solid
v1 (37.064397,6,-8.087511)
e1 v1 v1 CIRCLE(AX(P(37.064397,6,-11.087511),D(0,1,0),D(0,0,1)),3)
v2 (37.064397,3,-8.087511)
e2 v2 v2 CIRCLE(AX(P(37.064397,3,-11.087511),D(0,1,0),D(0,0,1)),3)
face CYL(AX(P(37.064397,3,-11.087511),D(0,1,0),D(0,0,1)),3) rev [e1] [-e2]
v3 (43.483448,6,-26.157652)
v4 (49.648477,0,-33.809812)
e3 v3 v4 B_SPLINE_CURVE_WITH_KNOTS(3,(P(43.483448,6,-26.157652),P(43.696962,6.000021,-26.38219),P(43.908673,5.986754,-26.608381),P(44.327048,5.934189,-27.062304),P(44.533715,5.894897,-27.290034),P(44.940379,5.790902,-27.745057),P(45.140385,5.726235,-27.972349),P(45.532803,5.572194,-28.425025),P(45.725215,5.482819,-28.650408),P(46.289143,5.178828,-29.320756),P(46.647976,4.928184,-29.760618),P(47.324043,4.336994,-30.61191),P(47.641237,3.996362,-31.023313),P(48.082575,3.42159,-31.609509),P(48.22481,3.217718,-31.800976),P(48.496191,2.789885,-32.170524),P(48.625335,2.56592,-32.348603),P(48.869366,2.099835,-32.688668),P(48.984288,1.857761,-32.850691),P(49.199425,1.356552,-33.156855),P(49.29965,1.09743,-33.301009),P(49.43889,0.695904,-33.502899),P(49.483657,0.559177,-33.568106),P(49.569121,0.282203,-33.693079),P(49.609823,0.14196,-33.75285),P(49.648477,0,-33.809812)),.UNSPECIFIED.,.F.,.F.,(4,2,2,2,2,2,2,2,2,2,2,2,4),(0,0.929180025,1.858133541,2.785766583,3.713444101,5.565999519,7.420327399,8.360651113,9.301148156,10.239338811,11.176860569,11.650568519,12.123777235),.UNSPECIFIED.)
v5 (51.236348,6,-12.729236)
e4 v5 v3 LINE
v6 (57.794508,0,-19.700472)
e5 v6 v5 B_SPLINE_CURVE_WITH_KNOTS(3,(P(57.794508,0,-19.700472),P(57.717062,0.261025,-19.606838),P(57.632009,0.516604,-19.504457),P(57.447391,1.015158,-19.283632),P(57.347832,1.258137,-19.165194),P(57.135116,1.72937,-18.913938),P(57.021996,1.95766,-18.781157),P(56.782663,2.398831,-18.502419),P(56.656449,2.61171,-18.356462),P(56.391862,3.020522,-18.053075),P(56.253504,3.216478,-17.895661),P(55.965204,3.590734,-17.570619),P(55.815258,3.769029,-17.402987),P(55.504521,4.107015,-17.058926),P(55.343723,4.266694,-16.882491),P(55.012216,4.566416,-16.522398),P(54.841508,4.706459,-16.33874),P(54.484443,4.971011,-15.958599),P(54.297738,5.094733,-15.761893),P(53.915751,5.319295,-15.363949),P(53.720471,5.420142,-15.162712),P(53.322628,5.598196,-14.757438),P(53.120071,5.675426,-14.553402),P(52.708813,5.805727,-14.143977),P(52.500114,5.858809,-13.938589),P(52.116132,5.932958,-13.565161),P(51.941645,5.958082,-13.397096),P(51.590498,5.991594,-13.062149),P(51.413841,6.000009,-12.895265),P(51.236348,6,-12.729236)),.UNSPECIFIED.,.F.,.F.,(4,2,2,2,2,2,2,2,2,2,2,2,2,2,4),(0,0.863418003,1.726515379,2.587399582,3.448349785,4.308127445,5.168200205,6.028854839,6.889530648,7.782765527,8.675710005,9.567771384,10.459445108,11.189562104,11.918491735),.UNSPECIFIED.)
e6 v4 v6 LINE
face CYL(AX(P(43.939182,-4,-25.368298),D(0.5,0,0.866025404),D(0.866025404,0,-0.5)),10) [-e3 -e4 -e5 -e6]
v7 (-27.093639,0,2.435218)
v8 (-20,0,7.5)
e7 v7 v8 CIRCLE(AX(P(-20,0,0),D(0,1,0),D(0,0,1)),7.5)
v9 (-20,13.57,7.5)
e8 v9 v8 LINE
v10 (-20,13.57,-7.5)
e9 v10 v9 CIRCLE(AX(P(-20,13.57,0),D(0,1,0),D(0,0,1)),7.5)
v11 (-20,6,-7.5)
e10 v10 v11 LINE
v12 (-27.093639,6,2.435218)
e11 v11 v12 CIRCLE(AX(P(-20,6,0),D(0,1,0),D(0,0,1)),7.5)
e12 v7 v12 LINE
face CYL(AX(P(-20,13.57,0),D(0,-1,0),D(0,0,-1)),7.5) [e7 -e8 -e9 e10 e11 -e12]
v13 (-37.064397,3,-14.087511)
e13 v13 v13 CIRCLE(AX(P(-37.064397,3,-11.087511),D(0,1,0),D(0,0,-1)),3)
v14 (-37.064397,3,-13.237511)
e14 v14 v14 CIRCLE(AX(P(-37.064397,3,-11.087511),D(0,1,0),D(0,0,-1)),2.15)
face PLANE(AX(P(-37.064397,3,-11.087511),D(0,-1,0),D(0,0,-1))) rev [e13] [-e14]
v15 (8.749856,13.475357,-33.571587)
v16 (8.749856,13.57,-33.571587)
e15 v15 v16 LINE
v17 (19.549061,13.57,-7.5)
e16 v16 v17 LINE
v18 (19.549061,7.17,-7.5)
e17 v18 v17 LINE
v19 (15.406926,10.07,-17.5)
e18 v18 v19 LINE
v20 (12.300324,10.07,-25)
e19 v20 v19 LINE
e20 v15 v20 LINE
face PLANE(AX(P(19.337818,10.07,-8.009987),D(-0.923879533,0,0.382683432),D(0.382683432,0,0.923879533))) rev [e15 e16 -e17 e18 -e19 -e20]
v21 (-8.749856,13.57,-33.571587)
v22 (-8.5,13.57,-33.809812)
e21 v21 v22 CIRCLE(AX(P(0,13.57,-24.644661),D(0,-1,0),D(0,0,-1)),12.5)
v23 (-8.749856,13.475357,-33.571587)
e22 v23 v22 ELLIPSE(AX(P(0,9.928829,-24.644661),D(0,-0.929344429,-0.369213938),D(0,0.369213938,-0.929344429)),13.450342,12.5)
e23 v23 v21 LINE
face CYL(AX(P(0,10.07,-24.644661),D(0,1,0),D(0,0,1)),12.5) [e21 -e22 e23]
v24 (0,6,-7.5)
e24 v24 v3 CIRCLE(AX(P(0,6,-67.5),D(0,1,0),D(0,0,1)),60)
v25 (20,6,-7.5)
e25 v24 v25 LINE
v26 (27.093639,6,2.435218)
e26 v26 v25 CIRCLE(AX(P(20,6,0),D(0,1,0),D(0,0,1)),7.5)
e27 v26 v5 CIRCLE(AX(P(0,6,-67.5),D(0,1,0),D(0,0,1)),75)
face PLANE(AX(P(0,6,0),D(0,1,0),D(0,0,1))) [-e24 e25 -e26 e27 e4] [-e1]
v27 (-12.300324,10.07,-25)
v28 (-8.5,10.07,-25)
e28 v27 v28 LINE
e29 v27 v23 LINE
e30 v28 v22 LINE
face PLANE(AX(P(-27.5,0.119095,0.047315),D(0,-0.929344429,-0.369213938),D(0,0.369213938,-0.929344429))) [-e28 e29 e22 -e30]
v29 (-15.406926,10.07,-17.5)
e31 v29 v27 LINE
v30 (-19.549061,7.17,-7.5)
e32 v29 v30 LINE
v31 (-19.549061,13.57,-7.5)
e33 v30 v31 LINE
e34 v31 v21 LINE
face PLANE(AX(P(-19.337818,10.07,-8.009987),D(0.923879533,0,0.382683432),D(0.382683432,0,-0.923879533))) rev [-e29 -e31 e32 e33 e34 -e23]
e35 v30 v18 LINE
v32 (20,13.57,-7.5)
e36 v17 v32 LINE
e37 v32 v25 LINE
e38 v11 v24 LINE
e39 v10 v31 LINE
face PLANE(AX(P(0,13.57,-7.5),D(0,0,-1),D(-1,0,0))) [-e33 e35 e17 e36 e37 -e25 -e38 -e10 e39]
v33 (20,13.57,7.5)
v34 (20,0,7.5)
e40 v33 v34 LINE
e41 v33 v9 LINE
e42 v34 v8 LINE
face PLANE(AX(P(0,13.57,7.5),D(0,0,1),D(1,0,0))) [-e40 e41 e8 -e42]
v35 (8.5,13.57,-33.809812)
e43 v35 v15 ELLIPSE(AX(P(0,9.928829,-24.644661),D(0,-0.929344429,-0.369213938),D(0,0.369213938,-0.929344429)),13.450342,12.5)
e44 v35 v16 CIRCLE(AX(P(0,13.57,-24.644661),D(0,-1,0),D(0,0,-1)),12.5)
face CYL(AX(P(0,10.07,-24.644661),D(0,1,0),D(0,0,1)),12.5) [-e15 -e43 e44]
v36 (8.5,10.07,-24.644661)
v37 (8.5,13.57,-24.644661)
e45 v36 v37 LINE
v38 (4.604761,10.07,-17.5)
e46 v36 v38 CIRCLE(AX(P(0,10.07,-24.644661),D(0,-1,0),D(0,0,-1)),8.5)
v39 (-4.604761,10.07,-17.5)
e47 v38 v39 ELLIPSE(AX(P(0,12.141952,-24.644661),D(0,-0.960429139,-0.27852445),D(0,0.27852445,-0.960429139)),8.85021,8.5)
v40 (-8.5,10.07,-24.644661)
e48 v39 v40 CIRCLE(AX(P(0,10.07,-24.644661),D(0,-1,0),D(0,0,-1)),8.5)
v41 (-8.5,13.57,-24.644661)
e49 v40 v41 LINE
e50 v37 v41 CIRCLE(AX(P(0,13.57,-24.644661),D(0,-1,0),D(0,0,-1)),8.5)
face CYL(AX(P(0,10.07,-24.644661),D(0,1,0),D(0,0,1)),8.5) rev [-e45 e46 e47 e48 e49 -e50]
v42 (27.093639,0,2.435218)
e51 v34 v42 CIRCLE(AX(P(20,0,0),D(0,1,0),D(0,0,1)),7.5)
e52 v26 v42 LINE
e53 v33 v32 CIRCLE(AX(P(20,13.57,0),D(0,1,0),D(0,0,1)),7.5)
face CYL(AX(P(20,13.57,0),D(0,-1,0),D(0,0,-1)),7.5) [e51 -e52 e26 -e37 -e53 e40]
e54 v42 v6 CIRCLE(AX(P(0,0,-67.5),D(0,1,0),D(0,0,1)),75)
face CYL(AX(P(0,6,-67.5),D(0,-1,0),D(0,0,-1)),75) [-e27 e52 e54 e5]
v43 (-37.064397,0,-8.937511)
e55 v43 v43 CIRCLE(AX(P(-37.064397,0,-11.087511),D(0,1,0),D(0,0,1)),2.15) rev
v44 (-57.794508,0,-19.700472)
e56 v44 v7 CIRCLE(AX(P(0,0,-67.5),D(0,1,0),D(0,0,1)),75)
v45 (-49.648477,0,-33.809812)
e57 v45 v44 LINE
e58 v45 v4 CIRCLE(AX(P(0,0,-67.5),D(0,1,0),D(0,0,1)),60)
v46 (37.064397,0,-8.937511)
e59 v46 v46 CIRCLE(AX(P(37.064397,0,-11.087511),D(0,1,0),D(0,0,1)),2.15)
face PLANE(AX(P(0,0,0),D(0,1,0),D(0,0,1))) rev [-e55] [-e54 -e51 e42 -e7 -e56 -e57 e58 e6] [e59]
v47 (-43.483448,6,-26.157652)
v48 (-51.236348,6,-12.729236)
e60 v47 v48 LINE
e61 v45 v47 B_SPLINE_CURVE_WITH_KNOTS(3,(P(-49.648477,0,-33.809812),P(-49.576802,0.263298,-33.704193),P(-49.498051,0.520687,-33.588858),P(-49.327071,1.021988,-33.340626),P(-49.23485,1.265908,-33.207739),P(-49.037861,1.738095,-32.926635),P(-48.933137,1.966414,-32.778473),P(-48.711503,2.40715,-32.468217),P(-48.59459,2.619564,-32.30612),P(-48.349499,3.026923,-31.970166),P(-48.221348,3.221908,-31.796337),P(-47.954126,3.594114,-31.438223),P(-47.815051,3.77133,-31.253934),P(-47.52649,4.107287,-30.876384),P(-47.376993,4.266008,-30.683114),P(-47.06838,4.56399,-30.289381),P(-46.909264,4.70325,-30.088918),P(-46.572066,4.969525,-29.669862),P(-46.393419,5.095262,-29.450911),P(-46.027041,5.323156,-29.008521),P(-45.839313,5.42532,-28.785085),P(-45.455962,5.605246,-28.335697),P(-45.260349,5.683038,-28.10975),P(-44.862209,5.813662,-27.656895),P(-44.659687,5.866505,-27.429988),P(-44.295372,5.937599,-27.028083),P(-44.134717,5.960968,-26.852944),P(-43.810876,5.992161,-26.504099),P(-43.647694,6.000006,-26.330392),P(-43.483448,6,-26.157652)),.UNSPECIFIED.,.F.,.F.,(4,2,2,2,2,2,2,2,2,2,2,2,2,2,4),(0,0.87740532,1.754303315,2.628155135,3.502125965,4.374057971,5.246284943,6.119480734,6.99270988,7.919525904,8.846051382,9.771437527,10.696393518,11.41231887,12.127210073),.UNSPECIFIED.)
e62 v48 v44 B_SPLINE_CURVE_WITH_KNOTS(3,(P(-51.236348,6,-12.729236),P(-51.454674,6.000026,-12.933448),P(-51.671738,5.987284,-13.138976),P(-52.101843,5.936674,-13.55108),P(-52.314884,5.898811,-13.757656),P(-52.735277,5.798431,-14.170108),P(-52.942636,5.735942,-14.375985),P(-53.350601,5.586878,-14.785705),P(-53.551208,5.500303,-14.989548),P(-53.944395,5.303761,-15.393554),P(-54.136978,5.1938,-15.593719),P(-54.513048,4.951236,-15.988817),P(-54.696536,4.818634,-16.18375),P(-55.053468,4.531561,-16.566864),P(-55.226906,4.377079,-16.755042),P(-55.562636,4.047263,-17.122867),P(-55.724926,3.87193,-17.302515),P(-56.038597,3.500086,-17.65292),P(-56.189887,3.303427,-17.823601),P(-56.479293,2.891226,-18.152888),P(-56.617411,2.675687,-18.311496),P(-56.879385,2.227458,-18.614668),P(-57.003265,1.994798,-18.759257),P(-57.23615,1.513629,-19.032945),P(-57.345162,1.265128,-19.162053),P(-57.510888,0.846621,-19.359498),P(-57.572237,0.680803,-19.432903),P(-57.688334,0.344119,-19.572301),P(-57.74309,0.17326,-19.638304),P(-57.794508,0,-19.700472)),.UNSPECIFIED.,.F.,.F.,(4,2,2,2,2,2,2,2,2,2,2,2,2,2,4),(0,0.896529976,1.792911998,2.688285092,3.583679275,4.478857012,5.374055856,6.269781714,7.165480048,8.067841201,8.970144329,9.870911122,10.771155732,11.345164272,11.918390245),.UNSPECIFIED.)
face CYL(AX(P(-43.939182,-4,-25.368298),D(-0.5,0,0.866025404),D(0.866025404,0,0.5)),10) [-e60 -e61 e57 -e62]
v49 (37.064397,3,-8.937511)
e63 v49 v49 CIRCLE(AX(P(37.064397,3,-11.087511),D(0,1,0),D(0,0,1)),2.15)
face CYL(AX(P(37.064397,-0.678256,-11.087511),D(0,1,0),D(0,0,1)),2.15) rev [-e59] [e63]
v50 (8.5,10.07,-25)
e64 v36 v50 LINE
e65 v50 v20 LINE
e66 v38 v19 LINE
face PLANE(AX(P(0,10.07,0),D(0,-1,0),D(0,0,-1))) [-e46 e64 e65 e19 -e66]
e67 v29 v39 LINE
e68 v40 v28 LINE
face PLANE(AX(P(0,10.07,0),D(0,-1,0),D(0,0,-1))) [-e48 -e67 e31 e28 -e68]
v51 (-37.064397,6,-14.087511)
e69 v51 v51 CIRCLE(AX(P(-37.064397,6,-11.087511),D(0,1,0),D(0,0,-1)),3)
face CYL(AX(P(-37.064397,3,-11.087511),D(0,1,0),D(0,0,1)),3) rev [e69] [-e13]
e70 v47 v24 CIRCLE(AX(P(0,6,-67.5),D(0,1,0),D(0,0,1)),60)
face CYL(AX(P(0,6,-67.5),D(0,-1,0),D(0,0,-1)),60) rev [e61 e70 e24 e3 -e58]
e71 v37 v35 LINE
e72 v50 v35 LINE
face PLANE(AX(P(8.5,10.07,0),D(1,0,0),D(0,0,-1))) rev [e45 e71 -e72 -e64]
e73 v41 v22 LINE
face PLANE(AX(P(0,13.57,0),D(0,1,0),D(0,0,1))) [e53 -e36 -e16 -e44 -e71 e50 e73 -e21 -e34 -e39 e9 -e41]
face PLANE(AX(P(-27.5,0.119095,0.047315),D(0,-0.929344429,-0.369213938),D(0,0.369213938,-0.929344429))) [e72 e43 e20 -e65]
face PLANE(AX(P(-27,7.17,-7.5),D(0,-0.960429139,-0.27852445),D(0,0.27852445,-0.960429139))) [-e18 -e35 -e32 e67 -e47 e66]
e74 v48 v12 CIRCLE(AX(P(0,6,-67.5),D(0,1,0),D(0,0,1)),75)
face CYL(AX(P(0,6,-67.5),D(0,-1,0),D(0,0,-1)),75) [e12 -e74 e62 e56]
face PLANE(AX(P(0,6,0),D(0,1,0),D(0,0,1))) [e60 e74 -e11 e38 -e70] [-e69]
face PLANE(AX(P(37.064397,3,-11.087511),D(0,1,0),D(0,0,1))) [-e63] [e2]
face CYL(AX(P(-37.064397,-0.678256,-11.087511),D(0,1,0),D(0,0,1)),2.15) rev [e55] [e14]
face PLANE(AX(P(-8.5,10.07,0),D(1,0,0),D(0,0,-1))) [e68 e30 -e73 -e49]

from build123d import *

# Parameters (mm, degrees)
BOSS_EXTRUDE1_DEPTH      = 13.57
BOSS_EXTRUDE3_DEPTH      = 3.5
BOSS_EXTRUDE4_DEPTH      = 26
BOSS_EXTRUDE4_DEPTH_BACK = 27
CUT_EXTRUDE1_DEPTH       = 45.729836908
CUT_EXTRUDE1_DEPTH_BACK  = 45.729836908
CUT_EXTRUDE2_DEPTH       = 46.64535365
CUT_EXTRUDE2_DEPTH_BACK  = 46.64535365
BOSS_EXTRUDE5_DEPTH      = 6
FILLET1_R                = 10
SKETCH8_R                = 2.15
CUT_EXTRUDE3_DEPTH       = 68.384074457
SKETCH8_4_R              = 3
SKETCH8_4_R_2            = 2.15
CUT_EXTRUDE4_DEPTH       = 3


with BuildPart() as part:
    # Sketch1 → Boss-Extrude1 (new body)
    with BuildSketch(Plane(origin=(0, 0, 0), x_dir=(1, 0, 0), z_dir=(0, 1, 0))):
        with BuildLine():
            Line((20, 7.5), (-20, 7.5))
            ThreePointArc((-20, 7.5), (-27.5, 0), (-20, -7.5))
            Line((-20, -7.5), (20, -7.5))
            ThreePointArc((20, -7.5), (27.5, 0), (20, 7.5))
        make_face()
    extrude(amount=BOSS_EXTRUDE1_DEPTH)

    # Sketch3 → Boss-Extrude3 (add)
    with BuildSketch(Plane(origin=(0, 13.57, 0), x_dir=(-1, 0, 0), z_dir=(0, -1, 0))):
        with BuildLine():
            Line((-19.549061387, 7.5), (19.549061387, 7.5))
            Line((19.549061387, 7.5), (12.499372909, 24.519453536))
            ThreePointArc((12.499372909, 24.519453536), (0, 12.144660941), (-12.499372909, 24.519453536))
            Line((-12.499372909, 24.519453536), (-19.549061387, 7.5))
        make_face()
        with BuildLine():
            ThreePointArc((-12.499372909, 24.519453536), (0, 12.144660941), (12.499372909, 24.519453536))
            Line((12.499372909, 24.519453536), (8.749856339, 33.57158729))
            ThreePointArc((8.749856339, 33.57158729), (8.625750618, 33.691562414), (8.5, 33.809812331))
            Line((8.5, 33.809812331), (8.5, 24.644660941))
            ThreePointArc((8.5, 24.644660941), (0, 16.144660941), (-8.5, 24.644660941))
            Line((-8.5, 24.644660941), (-8.5, 33.809812331))
            ThreePointArc((-8.5, 33.809812331), (-8.625750618, 33.691562414), (-8.749856339, 33.57158729))
            Line((-8.749856339, 33.57158729), (-12.499372909, 24.519453536))
        make_face()
    extrude(amount=BOSS_EXTRUDE3_DEPTH)

    # Sketch4 → Boss-Extrude4 (add, two sides: drawn at the far end of the back side and taken through both)
    with BuildSketch(Plane(origin=(0, 0, 0), x_dir=(0, 0, -1), z_dir=(1, 0, 0)).offset(-BOSS_EXTRUDE4_DEPTH_BACK)):
        Polygon((7.5, 10.07), (7.5, 7.17), (17.5, 10.07), align=None)
    extrude(amount=BOSS_EXTRUDE4_DEPTH + BOSS_EXTRUDE4_DEPTH_BACK)

    # Sketch5 → Cut-Extrude1 (cut, two sides: drawn at the far end of the back side and taken through both)
    with BuildSketch(Plane(origin=(0, 10.07, 0), x_dir=(1, 0, 0), z_dir=(0, 1, 0)).offset(-CUT_EXTRUDE1_DEPTH_BACK)):
        Polygon((-19.549061387, 7.5), (-15.406925764, 17.5), (-27, 17.5), (-27, 7.5), (-20, 7.5), align=None)
        Polygon((15.406925764, 17.5), (19.549061387, 7.5), (20, 7.5), (26, 7.5), (26, 17.5), align=None)
        with BuildLine():
            Line((4.604760585, 17.5), (-4.604760585, 17.5))
            ThreePointArc((-4.604760585, 17.5), (0, 16.144660941), (4.604760585, 17.5))
        make_face()
    extrude(amount=CUT_EXTRUDE1_DEPTH + CUT_EXTRUDE1_DEPTH_BACK, mode=Mode.SUBTRACT)

    # Sketch6 → Cut-Extrude2 (cut, two sides: drawn at the far end of the back side and taken through both)
    with BuildSketch(Plane(origin=(0, 0, 0), x_dir=(0, 0, -1), z_dir=(1, 0, 0)).offset(-CUT_EXTRUDE2_DEPTH_BACK)):
        Polygon((32.504181683, 4.538254004), (33.809812331, 6.646903952), (33.809812331, 13.57), (25, 10.07), align=None)
    extrude(amount=CUT_EXTRUDE2_DEPTH + CUT_EXTRUDE2_DEPTH_BACK, mode=Mode.SUBTRACT)

    # Sketch7 → Boss-Extrude5 (add)
    with BuildSketch(Plane(origin=(0, 0, 0), x_dir=(1, 0, 0), z_dir=(0, 1, 0))):
        with BuildLine():
            Line((57.794508063, 19.700472411), (49.648476863, 33.809812331))
            ThreePointArc((49.648476863, 33.809812331), (0, 7.5), (-49.648476863, 33.809812331))
            Line((-49.648476863, 33.809812331), (-57.794508063, 19.700472411))
            ThreePointArc((-57.794508063, 19.700472411), (-31.93771633, -0.360019714), (-3.1e-07, -7.5))
            ThreePointArc((-3.1e-07, -7.5), (31.93771605, -0.360019846), (57.794508063, 19.700472411))
        make_face()
    extrude(amount=BOSS_EXTRUDE5_DEPTH)

    # Fillet1
    # the kernel refuses this fillet: 10 mm, written as the material it takes off along each edge
    with BuildSketch(Plane(origin=(-38.192037625, 6, -53.652947164), x_dir=(0.8660254037844376, 0, 0.5000000000000019), z_dir=(-0.5000000000000019, 0, 0.8660254037844376))) as fillet1_piece_1:
        with BuildLine():
            CenterArc((9.16515139, -10), FILLET1_R, 90, 66.421821522)
            Line((0, -6), (-0.183303028, -5.92))
            ThreePointArc((-0.183303028, -5.92), (-0.2, -3), (-0.2, 0))
            Line((-0.2, 0), (0, 0.2))
            Line((0, 0.2), (9.16515139, 0.2))
            Line((9.16515139, 0.2), (9.16515139, 0))
        make_face()
    extrude(amount=62.117819351, mode=Mode.SUBTRACT)
    with BuildSketch(Plane(origin=(69.250947301, 6, 0.142662422), x_dir=(0, -1, 0), z_dir=(-0.5000000000000019, 0, -0.8660254037844376))) as fillet1_piece_2:
        with BuildLine():
            CenterArc((10, 9.16515139), FILLET1_R, 180, 66.421821522)
            Line((0, 9.16515139), (-0.2, 9.16515139))
            Line((-0.2, 9.16515139), (-0.2, 0))
            Line((-0.2, 0), (0, -0.2))
            ThreePointArc((0, -0.2), (3, -0.2), (5.92, -0.183303028))
            Line((5.92, -0.183303028), (6, 0))
        make_face()
    extrude(amount=62.117819351, mode=Mode.SUBTRACT)

    # Sketch8 → Cut-Extrude3 (cut, through all)
    with BuildSketch(Plane(origin=(0, 6, 0), x_dir=(1, 0, 0), z_dir=(0, 1, 0))):
        with Locations(Location((37.064396977, 11.087510982, 0), (0, 0, 270))):
            Circle(SKETCH8_R)
        with Locations(Location((-37.064396977, 11.087510982, 0), (0, 0, 270))):
            Circle(SKETCH8_R)
    extrude(amount=-CUT_EXTRUDE3_DEPTH, mode=Mode.SUBTRACT)

    # Sketch8<4> → Cut-Extrude4 (cut)
    # profile 1 of 2: a face of its own
    with BuildSketch(Plane(origin=(0, 6, 0), x_dir=(1, 0, 0), z_dir=(0, 1, 0))):
        with Locations(Location((37.064396977, 11.087510982, 0), (0, 0, 270))):
            Circle(SKETCH8_4_R)
        with Locations(Location((37.064396977, 11.087510982, 0), (0, 0, 270))):
            Circle(SKETCH8_4_R_2, mode=Mode.SUBTRACT)
    # profile 2 of 2: a face of its own
    with BuildSketch(Plane(origin=(0, 6, 0), x_dir=(1, 0, 0), z_dir=(0, 1, 0))):
        with Locations(Location((-37.064396977, 11.087510982, 0), (0, 0, 90))):
            Circle(SKETCH8_4_R)
        with Locations(Location((-37.064396977, 11.087510982, 0), (0, 0, 270))):
            Circle(SKETCH8_4_R_2, mode=Mode.SUBTRACT)
    extrude(amount=-CUT_EXTRUDE4_DEPTH, mode=Mode.SUBTRACT)


solid = part.part
